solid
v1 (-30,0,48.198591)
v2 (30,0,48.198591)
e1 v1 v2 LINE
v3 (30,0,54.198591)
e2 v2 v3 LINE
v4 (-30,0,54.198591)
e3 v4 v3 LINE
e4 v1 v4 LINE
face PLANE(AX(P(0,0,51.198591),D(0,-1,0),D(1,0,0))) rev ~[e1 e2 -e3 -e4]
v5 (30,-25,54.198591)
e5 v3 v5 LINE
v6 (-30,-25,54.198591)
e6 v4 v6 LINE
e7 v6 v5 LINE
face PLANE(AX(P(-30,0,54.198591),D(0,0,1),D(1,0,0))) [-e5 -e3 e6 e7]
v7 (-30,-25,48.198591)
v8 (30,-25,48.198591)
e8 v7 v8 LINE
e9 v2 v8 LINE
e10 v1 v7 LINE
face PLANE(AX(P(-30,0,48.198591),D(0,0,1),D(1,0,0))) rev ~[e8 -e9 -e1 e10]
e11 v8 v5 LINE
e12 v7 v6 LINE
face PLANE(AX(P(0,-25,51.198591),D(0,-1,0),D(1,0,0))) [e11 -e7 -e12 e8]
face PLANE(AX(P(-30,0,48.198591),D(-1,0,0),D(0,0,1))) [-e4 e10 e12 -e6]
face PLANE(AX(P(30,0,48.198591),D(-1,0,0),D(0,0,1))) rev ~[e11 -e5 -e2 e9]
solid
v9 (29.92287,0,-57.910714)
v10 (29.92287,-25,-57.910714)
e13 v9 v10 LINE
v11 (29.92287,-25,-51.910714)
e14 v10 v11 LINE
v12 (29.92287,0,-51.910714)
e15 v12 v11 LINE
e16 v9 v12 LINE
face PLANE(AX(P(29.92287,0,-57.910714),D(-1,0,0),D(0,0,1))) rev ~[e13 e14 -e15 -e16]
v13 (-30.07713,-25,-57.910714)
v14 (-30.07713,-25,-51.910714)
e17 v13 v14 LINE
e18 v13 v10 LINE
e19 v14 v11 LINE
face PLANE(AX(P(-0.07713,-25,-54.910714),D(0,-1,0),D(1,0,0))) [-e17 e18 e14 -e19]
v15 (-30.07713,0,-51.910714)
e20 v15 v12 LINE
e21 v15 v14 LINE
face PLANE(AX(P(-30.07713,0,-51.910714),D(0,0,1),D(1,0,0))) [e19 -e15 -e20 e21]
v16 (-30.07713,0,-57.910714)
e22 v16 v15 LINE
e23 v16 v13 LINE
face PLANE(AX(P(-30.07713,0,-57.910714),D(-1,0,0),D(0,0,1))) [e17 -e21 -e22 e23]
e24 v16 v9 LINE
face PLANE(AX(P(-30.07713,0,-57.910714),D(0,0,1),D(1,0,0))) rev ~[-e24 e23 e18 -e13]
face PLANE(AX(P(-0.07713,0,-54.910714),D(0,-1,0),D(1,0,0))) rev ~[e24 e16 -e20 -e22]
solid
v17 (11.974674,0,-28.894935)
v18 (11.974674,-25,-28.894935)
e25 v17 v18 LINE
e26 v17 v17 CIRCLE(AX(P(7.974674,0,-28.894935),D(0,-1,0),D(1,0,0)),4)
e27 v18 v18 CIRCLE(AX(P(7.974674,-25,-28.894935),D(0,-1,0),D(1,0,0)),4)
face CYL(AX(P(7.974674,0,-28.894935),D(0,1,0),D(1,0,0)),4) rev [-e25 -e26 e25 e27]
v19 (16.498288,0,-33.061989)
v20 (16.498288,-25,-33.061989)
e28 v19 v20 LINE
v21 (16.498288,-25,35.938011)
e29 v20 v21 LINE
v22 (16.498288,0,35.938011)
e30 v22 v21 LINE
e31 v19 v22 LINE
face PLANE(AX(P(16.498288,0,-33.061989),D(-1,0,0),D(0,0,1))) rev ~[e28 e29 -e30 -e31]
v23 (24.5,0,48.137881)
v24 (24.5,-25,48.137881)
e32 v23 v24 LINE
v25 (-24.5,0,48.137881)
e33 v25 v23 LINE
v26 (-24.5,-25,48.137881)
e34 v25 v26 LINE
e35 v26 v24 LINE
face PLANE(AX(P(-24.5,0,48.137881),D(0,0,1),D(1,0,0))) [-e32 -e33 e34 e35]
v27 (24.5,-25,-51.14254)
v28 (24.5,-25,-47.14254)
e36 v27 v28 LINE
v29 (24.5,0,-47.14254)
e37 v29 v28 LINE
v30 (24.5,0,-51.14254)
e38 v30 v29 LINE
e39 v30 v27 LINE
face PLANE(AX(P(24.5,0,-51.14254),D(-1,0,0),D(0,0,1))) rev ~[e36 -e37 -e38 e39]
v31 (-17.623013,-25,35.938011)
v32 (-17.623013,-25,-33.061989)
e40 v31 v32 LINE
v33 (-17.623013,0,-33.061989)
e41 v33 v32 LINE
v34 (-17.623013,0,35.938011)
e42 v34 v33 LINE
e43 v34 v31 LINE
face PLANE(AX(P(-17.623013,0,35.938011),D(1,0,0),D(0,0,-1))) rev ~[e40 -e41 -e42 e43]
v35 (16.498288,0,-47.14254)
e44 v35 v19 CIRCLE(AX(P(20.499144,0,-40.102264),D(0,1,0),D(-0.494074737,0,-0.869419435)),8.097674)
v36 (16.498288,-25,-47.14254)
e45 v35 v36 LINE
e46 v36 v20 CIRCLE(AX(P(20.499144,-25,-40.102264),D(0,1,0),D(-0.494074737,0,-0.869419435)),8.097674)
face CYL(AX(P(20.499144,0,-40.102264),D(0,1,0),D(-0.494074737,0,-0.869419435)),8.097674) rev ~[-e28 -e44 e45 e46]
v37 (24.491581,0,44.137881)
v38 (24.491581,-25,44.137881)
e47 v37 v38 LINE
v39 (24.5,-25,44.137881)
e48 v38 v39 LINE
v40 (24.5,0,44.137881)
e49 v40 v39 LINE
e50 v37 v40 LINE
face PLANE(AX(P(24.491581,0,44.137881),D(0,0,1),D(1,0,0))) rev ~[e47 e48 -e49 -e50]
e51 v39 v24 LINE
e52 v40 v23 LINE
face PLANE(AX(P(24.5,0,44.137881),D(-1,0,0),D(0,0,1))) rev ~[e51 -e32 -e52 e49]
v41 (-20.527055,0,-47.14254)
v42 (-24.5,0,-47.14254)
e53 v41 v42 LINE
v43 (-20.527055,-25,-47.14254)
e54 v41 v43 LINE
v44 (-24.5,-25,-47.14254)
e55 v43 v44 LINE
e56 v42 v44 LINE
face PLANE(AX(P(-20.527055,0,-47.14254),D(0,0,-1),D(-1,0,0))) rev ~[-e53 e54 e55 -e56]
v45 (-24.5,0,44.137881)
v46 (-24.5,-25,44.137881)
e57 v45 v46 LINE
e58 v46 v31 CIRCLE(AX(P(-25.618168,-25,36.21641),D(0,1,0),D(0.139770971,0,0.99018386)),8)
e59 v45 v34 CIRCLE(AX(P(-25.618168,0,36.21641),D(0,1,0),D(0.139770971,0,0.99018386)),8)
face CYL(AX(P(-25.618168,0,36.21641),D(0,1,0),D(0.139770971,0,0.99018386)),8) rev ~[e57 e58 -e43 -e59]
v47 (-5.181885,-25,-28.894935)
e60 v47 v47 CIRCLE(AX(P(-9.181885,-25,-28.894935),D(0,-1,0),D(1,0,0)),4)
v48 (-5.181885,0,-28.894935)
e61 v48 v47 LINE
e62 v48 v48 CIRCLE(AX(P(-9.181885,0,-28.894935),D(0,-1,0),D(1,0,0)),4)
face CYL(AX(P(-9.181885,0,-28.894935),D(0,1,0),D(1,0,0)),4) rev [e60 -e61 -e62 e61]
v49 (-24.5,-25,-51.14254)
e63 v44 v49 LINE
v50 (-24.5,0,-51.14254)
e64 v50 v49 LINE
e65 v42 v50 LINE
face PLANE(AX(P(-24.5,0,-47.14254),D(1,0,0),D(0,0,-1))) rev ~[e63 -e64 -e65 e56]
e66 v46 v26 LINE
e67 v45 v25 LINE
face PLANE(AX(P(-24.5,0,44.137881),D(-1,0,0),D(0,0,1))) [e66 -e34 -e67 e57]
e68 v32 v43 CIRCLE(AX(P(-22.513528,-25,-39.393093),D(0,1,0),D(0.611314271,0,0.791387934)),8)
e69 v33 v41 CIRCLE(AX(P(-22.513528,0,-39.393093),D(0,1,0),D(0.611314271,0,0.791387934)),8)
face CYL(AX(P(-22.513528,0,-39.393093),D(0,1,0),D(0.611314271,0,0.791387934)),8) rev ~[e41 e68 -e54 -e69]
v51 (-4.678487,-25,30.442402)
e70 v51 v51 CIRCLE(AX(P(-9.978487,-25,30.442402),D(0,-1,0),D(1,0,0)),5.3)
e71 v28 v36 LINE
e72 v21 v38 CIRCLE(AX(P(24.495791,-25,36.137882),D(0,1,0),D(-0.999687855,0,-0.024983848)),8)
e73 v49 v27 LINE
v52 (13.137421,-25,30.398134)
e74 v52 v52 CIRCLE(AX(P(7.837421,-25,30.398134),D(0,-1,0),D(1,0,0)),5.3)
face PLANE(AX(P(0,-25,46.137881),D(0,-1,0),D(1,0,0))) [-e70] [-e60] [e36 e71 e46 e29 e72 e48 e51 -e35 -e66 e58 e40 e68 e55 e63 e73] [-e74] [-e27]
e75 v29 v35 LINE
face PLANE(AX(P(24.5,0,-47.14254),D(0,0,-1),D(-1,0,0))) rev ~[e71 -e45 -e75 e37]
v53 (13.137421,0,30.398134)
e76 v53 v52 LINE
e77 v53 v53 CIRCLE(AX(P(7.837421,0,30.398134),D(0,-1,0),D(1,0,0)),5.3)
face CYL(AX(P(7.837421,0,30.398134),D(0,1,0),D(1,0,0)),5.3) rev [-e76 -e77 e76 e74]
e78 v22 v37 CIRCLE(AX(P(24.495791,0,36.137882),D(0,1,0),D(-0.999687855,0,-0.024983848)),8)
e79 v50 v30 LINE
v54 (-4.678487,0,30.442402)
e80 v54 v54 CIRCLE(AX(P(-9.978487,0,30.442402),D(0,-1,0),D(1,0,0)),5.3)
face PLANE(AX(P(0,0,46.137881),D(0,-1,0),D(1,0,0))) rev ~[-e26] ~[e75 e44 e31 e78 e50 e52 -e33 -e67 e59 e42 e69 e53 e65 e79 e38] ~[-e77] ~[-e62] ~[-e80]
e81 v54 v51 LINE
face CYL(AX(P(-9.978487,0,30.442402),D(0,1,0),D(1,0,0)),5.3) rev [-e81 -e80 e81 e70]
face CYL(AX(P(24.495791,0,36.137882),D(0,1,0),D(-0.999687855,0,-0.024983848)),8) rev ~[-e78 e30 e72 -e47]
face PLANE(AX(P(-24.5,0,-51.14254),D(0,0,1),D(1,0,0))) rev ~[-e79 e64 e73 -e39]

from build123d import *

# Parameters (mm, degrees)
F0_W     = 60
F0_H     = 6
F1_DEPTH = 25
F0_W_2   = 49
F0_H_2   = 4
F0_R     = 4
F0_R_2   = 5.3


with BuildPart() as f1:
    # F0 (on Front) → F1 (new body)
    with BuildSketch(Plane.XZ):
        with Locations((-0.0771296024, -54.9107142985)):
            Rectangle(F0_W, F0_H)
    extrude(amount=F1_DEPTH)


with BuildPart() as f1b:
    # F0 (on Front) → F1, piece 2 (new body)
    with BuildSketch(Plane.XZ):
        with Locations((0, 51.1985905468)):
            Rectangle(F0_W, F0_H)
    extrude(amount=F1_DEPTH)


with BuildPart() as f1c:
    # F0 (on Front) → F1, piece 3 (new body)
    with BuildSketch(Plane.XZ):
        with Locations((0, 46.1378805339)):
            Rectangle(F0_W_2, F0_H_2)
        with BuildLine():
            ThreePointArc((24.5, -47.1425395012), (20.4991438354, -48.1999383489), (16.4982876707, -47.1425395012))
            Line((16.4982876707, -47.1425395012), (-20.5270550462, -47.1425395012))
            ThreePointArc((-20.5270550462, -47.1425395012), (-22.5135275231, -47.3930926113), (-24.5, -47.1425395012))
            Line((-24.5, -47.1425395012), (-24.5, -51.1425395012))
            Line((-24.5, -51.1425395012), (24.5, -51.1425395012))
            Line((24.5, -51.1425395012), (24.5, -47.1425395012))
        make_face()
        with BuildLine():
            ThreePointArc((16.4982876707, 35.9380108601), (18.7701769789, 41.7251304893), (24.5, 44.1378805339))
            Line((24.5, 44.1378805339), (-24.5, 44.1378805339))
            ThreePointArc((-24.5, 44.1378805339), (-19.4885163945, 41.3571658308), (-17.6230133544, 35.9380108601))
            Line((-17.6230133544, 35.9380108601), (16.4982876707, 35.9380108601))
        make_face()
        with BuildLine():
            ThreePointArc((-24.5, -47.1425395012), (-22.5135275231, -47.3930926113), (-20.5270550462, -47.1425395012))
            Line((-20.5270550462, -47.1425395012), (-24.5, -47.1425395012))
        make_face()
        with BuildLine():
            Line((24.5, -47.1425395012), (16.4982876707, -47.1425395012))
            ThreePointArc((16.4982876707, -47.1425395012), (20.4991438354, -48.1999383489), (24.5, -47.1425395012))
        make_face()
        with BuildLine():
            Line((16.4982876707, -33.0619891399), (16.4982876707, 35.9380108601))
            Line((16.4982876707, 35.9380108601), (-17.6230133544, 35.9380108601))
            Line((-17.6230133544, 35.9380108601), (-17.6230133544, -33.0619891399))
            ThreePointArc((-17.6230133544, -33.0619891399), (-14.678432696, -41.0090409552), (-20.5270550462, -47.1425395012))
            Line((-20.5270550462, -47.1425395012), (16.4982876707, -47.1425395012))
            ThreePointArc((16.4982876707, -47.1425395012), (12.401469807, -40.1022643205), (16.4982876707, -33.0619891399))
        make_face()
        with Locations((-9.1818850487, -28.8949348032)):
            Circle(F0_R, mode=Mode.SUBTRACT)
        with Locations((7.9746739939, -28.8949348032)):
            Circle(F0_R, mode=Mode.SUBTRACT)
        with Locations((-9.9784871563, 30.4424017668)):
            Circle(F0_R_2, mode=Mode.SUBTRACT)
        with Locations((7.8374212608, 30.3981341422)):
            Circle(F0_R_2, mode=Mode.SUBTRACT)
    extrude(amount=F1_DEPTH)


solid = Compound([f1.part, f1b.part, f1c.part])
